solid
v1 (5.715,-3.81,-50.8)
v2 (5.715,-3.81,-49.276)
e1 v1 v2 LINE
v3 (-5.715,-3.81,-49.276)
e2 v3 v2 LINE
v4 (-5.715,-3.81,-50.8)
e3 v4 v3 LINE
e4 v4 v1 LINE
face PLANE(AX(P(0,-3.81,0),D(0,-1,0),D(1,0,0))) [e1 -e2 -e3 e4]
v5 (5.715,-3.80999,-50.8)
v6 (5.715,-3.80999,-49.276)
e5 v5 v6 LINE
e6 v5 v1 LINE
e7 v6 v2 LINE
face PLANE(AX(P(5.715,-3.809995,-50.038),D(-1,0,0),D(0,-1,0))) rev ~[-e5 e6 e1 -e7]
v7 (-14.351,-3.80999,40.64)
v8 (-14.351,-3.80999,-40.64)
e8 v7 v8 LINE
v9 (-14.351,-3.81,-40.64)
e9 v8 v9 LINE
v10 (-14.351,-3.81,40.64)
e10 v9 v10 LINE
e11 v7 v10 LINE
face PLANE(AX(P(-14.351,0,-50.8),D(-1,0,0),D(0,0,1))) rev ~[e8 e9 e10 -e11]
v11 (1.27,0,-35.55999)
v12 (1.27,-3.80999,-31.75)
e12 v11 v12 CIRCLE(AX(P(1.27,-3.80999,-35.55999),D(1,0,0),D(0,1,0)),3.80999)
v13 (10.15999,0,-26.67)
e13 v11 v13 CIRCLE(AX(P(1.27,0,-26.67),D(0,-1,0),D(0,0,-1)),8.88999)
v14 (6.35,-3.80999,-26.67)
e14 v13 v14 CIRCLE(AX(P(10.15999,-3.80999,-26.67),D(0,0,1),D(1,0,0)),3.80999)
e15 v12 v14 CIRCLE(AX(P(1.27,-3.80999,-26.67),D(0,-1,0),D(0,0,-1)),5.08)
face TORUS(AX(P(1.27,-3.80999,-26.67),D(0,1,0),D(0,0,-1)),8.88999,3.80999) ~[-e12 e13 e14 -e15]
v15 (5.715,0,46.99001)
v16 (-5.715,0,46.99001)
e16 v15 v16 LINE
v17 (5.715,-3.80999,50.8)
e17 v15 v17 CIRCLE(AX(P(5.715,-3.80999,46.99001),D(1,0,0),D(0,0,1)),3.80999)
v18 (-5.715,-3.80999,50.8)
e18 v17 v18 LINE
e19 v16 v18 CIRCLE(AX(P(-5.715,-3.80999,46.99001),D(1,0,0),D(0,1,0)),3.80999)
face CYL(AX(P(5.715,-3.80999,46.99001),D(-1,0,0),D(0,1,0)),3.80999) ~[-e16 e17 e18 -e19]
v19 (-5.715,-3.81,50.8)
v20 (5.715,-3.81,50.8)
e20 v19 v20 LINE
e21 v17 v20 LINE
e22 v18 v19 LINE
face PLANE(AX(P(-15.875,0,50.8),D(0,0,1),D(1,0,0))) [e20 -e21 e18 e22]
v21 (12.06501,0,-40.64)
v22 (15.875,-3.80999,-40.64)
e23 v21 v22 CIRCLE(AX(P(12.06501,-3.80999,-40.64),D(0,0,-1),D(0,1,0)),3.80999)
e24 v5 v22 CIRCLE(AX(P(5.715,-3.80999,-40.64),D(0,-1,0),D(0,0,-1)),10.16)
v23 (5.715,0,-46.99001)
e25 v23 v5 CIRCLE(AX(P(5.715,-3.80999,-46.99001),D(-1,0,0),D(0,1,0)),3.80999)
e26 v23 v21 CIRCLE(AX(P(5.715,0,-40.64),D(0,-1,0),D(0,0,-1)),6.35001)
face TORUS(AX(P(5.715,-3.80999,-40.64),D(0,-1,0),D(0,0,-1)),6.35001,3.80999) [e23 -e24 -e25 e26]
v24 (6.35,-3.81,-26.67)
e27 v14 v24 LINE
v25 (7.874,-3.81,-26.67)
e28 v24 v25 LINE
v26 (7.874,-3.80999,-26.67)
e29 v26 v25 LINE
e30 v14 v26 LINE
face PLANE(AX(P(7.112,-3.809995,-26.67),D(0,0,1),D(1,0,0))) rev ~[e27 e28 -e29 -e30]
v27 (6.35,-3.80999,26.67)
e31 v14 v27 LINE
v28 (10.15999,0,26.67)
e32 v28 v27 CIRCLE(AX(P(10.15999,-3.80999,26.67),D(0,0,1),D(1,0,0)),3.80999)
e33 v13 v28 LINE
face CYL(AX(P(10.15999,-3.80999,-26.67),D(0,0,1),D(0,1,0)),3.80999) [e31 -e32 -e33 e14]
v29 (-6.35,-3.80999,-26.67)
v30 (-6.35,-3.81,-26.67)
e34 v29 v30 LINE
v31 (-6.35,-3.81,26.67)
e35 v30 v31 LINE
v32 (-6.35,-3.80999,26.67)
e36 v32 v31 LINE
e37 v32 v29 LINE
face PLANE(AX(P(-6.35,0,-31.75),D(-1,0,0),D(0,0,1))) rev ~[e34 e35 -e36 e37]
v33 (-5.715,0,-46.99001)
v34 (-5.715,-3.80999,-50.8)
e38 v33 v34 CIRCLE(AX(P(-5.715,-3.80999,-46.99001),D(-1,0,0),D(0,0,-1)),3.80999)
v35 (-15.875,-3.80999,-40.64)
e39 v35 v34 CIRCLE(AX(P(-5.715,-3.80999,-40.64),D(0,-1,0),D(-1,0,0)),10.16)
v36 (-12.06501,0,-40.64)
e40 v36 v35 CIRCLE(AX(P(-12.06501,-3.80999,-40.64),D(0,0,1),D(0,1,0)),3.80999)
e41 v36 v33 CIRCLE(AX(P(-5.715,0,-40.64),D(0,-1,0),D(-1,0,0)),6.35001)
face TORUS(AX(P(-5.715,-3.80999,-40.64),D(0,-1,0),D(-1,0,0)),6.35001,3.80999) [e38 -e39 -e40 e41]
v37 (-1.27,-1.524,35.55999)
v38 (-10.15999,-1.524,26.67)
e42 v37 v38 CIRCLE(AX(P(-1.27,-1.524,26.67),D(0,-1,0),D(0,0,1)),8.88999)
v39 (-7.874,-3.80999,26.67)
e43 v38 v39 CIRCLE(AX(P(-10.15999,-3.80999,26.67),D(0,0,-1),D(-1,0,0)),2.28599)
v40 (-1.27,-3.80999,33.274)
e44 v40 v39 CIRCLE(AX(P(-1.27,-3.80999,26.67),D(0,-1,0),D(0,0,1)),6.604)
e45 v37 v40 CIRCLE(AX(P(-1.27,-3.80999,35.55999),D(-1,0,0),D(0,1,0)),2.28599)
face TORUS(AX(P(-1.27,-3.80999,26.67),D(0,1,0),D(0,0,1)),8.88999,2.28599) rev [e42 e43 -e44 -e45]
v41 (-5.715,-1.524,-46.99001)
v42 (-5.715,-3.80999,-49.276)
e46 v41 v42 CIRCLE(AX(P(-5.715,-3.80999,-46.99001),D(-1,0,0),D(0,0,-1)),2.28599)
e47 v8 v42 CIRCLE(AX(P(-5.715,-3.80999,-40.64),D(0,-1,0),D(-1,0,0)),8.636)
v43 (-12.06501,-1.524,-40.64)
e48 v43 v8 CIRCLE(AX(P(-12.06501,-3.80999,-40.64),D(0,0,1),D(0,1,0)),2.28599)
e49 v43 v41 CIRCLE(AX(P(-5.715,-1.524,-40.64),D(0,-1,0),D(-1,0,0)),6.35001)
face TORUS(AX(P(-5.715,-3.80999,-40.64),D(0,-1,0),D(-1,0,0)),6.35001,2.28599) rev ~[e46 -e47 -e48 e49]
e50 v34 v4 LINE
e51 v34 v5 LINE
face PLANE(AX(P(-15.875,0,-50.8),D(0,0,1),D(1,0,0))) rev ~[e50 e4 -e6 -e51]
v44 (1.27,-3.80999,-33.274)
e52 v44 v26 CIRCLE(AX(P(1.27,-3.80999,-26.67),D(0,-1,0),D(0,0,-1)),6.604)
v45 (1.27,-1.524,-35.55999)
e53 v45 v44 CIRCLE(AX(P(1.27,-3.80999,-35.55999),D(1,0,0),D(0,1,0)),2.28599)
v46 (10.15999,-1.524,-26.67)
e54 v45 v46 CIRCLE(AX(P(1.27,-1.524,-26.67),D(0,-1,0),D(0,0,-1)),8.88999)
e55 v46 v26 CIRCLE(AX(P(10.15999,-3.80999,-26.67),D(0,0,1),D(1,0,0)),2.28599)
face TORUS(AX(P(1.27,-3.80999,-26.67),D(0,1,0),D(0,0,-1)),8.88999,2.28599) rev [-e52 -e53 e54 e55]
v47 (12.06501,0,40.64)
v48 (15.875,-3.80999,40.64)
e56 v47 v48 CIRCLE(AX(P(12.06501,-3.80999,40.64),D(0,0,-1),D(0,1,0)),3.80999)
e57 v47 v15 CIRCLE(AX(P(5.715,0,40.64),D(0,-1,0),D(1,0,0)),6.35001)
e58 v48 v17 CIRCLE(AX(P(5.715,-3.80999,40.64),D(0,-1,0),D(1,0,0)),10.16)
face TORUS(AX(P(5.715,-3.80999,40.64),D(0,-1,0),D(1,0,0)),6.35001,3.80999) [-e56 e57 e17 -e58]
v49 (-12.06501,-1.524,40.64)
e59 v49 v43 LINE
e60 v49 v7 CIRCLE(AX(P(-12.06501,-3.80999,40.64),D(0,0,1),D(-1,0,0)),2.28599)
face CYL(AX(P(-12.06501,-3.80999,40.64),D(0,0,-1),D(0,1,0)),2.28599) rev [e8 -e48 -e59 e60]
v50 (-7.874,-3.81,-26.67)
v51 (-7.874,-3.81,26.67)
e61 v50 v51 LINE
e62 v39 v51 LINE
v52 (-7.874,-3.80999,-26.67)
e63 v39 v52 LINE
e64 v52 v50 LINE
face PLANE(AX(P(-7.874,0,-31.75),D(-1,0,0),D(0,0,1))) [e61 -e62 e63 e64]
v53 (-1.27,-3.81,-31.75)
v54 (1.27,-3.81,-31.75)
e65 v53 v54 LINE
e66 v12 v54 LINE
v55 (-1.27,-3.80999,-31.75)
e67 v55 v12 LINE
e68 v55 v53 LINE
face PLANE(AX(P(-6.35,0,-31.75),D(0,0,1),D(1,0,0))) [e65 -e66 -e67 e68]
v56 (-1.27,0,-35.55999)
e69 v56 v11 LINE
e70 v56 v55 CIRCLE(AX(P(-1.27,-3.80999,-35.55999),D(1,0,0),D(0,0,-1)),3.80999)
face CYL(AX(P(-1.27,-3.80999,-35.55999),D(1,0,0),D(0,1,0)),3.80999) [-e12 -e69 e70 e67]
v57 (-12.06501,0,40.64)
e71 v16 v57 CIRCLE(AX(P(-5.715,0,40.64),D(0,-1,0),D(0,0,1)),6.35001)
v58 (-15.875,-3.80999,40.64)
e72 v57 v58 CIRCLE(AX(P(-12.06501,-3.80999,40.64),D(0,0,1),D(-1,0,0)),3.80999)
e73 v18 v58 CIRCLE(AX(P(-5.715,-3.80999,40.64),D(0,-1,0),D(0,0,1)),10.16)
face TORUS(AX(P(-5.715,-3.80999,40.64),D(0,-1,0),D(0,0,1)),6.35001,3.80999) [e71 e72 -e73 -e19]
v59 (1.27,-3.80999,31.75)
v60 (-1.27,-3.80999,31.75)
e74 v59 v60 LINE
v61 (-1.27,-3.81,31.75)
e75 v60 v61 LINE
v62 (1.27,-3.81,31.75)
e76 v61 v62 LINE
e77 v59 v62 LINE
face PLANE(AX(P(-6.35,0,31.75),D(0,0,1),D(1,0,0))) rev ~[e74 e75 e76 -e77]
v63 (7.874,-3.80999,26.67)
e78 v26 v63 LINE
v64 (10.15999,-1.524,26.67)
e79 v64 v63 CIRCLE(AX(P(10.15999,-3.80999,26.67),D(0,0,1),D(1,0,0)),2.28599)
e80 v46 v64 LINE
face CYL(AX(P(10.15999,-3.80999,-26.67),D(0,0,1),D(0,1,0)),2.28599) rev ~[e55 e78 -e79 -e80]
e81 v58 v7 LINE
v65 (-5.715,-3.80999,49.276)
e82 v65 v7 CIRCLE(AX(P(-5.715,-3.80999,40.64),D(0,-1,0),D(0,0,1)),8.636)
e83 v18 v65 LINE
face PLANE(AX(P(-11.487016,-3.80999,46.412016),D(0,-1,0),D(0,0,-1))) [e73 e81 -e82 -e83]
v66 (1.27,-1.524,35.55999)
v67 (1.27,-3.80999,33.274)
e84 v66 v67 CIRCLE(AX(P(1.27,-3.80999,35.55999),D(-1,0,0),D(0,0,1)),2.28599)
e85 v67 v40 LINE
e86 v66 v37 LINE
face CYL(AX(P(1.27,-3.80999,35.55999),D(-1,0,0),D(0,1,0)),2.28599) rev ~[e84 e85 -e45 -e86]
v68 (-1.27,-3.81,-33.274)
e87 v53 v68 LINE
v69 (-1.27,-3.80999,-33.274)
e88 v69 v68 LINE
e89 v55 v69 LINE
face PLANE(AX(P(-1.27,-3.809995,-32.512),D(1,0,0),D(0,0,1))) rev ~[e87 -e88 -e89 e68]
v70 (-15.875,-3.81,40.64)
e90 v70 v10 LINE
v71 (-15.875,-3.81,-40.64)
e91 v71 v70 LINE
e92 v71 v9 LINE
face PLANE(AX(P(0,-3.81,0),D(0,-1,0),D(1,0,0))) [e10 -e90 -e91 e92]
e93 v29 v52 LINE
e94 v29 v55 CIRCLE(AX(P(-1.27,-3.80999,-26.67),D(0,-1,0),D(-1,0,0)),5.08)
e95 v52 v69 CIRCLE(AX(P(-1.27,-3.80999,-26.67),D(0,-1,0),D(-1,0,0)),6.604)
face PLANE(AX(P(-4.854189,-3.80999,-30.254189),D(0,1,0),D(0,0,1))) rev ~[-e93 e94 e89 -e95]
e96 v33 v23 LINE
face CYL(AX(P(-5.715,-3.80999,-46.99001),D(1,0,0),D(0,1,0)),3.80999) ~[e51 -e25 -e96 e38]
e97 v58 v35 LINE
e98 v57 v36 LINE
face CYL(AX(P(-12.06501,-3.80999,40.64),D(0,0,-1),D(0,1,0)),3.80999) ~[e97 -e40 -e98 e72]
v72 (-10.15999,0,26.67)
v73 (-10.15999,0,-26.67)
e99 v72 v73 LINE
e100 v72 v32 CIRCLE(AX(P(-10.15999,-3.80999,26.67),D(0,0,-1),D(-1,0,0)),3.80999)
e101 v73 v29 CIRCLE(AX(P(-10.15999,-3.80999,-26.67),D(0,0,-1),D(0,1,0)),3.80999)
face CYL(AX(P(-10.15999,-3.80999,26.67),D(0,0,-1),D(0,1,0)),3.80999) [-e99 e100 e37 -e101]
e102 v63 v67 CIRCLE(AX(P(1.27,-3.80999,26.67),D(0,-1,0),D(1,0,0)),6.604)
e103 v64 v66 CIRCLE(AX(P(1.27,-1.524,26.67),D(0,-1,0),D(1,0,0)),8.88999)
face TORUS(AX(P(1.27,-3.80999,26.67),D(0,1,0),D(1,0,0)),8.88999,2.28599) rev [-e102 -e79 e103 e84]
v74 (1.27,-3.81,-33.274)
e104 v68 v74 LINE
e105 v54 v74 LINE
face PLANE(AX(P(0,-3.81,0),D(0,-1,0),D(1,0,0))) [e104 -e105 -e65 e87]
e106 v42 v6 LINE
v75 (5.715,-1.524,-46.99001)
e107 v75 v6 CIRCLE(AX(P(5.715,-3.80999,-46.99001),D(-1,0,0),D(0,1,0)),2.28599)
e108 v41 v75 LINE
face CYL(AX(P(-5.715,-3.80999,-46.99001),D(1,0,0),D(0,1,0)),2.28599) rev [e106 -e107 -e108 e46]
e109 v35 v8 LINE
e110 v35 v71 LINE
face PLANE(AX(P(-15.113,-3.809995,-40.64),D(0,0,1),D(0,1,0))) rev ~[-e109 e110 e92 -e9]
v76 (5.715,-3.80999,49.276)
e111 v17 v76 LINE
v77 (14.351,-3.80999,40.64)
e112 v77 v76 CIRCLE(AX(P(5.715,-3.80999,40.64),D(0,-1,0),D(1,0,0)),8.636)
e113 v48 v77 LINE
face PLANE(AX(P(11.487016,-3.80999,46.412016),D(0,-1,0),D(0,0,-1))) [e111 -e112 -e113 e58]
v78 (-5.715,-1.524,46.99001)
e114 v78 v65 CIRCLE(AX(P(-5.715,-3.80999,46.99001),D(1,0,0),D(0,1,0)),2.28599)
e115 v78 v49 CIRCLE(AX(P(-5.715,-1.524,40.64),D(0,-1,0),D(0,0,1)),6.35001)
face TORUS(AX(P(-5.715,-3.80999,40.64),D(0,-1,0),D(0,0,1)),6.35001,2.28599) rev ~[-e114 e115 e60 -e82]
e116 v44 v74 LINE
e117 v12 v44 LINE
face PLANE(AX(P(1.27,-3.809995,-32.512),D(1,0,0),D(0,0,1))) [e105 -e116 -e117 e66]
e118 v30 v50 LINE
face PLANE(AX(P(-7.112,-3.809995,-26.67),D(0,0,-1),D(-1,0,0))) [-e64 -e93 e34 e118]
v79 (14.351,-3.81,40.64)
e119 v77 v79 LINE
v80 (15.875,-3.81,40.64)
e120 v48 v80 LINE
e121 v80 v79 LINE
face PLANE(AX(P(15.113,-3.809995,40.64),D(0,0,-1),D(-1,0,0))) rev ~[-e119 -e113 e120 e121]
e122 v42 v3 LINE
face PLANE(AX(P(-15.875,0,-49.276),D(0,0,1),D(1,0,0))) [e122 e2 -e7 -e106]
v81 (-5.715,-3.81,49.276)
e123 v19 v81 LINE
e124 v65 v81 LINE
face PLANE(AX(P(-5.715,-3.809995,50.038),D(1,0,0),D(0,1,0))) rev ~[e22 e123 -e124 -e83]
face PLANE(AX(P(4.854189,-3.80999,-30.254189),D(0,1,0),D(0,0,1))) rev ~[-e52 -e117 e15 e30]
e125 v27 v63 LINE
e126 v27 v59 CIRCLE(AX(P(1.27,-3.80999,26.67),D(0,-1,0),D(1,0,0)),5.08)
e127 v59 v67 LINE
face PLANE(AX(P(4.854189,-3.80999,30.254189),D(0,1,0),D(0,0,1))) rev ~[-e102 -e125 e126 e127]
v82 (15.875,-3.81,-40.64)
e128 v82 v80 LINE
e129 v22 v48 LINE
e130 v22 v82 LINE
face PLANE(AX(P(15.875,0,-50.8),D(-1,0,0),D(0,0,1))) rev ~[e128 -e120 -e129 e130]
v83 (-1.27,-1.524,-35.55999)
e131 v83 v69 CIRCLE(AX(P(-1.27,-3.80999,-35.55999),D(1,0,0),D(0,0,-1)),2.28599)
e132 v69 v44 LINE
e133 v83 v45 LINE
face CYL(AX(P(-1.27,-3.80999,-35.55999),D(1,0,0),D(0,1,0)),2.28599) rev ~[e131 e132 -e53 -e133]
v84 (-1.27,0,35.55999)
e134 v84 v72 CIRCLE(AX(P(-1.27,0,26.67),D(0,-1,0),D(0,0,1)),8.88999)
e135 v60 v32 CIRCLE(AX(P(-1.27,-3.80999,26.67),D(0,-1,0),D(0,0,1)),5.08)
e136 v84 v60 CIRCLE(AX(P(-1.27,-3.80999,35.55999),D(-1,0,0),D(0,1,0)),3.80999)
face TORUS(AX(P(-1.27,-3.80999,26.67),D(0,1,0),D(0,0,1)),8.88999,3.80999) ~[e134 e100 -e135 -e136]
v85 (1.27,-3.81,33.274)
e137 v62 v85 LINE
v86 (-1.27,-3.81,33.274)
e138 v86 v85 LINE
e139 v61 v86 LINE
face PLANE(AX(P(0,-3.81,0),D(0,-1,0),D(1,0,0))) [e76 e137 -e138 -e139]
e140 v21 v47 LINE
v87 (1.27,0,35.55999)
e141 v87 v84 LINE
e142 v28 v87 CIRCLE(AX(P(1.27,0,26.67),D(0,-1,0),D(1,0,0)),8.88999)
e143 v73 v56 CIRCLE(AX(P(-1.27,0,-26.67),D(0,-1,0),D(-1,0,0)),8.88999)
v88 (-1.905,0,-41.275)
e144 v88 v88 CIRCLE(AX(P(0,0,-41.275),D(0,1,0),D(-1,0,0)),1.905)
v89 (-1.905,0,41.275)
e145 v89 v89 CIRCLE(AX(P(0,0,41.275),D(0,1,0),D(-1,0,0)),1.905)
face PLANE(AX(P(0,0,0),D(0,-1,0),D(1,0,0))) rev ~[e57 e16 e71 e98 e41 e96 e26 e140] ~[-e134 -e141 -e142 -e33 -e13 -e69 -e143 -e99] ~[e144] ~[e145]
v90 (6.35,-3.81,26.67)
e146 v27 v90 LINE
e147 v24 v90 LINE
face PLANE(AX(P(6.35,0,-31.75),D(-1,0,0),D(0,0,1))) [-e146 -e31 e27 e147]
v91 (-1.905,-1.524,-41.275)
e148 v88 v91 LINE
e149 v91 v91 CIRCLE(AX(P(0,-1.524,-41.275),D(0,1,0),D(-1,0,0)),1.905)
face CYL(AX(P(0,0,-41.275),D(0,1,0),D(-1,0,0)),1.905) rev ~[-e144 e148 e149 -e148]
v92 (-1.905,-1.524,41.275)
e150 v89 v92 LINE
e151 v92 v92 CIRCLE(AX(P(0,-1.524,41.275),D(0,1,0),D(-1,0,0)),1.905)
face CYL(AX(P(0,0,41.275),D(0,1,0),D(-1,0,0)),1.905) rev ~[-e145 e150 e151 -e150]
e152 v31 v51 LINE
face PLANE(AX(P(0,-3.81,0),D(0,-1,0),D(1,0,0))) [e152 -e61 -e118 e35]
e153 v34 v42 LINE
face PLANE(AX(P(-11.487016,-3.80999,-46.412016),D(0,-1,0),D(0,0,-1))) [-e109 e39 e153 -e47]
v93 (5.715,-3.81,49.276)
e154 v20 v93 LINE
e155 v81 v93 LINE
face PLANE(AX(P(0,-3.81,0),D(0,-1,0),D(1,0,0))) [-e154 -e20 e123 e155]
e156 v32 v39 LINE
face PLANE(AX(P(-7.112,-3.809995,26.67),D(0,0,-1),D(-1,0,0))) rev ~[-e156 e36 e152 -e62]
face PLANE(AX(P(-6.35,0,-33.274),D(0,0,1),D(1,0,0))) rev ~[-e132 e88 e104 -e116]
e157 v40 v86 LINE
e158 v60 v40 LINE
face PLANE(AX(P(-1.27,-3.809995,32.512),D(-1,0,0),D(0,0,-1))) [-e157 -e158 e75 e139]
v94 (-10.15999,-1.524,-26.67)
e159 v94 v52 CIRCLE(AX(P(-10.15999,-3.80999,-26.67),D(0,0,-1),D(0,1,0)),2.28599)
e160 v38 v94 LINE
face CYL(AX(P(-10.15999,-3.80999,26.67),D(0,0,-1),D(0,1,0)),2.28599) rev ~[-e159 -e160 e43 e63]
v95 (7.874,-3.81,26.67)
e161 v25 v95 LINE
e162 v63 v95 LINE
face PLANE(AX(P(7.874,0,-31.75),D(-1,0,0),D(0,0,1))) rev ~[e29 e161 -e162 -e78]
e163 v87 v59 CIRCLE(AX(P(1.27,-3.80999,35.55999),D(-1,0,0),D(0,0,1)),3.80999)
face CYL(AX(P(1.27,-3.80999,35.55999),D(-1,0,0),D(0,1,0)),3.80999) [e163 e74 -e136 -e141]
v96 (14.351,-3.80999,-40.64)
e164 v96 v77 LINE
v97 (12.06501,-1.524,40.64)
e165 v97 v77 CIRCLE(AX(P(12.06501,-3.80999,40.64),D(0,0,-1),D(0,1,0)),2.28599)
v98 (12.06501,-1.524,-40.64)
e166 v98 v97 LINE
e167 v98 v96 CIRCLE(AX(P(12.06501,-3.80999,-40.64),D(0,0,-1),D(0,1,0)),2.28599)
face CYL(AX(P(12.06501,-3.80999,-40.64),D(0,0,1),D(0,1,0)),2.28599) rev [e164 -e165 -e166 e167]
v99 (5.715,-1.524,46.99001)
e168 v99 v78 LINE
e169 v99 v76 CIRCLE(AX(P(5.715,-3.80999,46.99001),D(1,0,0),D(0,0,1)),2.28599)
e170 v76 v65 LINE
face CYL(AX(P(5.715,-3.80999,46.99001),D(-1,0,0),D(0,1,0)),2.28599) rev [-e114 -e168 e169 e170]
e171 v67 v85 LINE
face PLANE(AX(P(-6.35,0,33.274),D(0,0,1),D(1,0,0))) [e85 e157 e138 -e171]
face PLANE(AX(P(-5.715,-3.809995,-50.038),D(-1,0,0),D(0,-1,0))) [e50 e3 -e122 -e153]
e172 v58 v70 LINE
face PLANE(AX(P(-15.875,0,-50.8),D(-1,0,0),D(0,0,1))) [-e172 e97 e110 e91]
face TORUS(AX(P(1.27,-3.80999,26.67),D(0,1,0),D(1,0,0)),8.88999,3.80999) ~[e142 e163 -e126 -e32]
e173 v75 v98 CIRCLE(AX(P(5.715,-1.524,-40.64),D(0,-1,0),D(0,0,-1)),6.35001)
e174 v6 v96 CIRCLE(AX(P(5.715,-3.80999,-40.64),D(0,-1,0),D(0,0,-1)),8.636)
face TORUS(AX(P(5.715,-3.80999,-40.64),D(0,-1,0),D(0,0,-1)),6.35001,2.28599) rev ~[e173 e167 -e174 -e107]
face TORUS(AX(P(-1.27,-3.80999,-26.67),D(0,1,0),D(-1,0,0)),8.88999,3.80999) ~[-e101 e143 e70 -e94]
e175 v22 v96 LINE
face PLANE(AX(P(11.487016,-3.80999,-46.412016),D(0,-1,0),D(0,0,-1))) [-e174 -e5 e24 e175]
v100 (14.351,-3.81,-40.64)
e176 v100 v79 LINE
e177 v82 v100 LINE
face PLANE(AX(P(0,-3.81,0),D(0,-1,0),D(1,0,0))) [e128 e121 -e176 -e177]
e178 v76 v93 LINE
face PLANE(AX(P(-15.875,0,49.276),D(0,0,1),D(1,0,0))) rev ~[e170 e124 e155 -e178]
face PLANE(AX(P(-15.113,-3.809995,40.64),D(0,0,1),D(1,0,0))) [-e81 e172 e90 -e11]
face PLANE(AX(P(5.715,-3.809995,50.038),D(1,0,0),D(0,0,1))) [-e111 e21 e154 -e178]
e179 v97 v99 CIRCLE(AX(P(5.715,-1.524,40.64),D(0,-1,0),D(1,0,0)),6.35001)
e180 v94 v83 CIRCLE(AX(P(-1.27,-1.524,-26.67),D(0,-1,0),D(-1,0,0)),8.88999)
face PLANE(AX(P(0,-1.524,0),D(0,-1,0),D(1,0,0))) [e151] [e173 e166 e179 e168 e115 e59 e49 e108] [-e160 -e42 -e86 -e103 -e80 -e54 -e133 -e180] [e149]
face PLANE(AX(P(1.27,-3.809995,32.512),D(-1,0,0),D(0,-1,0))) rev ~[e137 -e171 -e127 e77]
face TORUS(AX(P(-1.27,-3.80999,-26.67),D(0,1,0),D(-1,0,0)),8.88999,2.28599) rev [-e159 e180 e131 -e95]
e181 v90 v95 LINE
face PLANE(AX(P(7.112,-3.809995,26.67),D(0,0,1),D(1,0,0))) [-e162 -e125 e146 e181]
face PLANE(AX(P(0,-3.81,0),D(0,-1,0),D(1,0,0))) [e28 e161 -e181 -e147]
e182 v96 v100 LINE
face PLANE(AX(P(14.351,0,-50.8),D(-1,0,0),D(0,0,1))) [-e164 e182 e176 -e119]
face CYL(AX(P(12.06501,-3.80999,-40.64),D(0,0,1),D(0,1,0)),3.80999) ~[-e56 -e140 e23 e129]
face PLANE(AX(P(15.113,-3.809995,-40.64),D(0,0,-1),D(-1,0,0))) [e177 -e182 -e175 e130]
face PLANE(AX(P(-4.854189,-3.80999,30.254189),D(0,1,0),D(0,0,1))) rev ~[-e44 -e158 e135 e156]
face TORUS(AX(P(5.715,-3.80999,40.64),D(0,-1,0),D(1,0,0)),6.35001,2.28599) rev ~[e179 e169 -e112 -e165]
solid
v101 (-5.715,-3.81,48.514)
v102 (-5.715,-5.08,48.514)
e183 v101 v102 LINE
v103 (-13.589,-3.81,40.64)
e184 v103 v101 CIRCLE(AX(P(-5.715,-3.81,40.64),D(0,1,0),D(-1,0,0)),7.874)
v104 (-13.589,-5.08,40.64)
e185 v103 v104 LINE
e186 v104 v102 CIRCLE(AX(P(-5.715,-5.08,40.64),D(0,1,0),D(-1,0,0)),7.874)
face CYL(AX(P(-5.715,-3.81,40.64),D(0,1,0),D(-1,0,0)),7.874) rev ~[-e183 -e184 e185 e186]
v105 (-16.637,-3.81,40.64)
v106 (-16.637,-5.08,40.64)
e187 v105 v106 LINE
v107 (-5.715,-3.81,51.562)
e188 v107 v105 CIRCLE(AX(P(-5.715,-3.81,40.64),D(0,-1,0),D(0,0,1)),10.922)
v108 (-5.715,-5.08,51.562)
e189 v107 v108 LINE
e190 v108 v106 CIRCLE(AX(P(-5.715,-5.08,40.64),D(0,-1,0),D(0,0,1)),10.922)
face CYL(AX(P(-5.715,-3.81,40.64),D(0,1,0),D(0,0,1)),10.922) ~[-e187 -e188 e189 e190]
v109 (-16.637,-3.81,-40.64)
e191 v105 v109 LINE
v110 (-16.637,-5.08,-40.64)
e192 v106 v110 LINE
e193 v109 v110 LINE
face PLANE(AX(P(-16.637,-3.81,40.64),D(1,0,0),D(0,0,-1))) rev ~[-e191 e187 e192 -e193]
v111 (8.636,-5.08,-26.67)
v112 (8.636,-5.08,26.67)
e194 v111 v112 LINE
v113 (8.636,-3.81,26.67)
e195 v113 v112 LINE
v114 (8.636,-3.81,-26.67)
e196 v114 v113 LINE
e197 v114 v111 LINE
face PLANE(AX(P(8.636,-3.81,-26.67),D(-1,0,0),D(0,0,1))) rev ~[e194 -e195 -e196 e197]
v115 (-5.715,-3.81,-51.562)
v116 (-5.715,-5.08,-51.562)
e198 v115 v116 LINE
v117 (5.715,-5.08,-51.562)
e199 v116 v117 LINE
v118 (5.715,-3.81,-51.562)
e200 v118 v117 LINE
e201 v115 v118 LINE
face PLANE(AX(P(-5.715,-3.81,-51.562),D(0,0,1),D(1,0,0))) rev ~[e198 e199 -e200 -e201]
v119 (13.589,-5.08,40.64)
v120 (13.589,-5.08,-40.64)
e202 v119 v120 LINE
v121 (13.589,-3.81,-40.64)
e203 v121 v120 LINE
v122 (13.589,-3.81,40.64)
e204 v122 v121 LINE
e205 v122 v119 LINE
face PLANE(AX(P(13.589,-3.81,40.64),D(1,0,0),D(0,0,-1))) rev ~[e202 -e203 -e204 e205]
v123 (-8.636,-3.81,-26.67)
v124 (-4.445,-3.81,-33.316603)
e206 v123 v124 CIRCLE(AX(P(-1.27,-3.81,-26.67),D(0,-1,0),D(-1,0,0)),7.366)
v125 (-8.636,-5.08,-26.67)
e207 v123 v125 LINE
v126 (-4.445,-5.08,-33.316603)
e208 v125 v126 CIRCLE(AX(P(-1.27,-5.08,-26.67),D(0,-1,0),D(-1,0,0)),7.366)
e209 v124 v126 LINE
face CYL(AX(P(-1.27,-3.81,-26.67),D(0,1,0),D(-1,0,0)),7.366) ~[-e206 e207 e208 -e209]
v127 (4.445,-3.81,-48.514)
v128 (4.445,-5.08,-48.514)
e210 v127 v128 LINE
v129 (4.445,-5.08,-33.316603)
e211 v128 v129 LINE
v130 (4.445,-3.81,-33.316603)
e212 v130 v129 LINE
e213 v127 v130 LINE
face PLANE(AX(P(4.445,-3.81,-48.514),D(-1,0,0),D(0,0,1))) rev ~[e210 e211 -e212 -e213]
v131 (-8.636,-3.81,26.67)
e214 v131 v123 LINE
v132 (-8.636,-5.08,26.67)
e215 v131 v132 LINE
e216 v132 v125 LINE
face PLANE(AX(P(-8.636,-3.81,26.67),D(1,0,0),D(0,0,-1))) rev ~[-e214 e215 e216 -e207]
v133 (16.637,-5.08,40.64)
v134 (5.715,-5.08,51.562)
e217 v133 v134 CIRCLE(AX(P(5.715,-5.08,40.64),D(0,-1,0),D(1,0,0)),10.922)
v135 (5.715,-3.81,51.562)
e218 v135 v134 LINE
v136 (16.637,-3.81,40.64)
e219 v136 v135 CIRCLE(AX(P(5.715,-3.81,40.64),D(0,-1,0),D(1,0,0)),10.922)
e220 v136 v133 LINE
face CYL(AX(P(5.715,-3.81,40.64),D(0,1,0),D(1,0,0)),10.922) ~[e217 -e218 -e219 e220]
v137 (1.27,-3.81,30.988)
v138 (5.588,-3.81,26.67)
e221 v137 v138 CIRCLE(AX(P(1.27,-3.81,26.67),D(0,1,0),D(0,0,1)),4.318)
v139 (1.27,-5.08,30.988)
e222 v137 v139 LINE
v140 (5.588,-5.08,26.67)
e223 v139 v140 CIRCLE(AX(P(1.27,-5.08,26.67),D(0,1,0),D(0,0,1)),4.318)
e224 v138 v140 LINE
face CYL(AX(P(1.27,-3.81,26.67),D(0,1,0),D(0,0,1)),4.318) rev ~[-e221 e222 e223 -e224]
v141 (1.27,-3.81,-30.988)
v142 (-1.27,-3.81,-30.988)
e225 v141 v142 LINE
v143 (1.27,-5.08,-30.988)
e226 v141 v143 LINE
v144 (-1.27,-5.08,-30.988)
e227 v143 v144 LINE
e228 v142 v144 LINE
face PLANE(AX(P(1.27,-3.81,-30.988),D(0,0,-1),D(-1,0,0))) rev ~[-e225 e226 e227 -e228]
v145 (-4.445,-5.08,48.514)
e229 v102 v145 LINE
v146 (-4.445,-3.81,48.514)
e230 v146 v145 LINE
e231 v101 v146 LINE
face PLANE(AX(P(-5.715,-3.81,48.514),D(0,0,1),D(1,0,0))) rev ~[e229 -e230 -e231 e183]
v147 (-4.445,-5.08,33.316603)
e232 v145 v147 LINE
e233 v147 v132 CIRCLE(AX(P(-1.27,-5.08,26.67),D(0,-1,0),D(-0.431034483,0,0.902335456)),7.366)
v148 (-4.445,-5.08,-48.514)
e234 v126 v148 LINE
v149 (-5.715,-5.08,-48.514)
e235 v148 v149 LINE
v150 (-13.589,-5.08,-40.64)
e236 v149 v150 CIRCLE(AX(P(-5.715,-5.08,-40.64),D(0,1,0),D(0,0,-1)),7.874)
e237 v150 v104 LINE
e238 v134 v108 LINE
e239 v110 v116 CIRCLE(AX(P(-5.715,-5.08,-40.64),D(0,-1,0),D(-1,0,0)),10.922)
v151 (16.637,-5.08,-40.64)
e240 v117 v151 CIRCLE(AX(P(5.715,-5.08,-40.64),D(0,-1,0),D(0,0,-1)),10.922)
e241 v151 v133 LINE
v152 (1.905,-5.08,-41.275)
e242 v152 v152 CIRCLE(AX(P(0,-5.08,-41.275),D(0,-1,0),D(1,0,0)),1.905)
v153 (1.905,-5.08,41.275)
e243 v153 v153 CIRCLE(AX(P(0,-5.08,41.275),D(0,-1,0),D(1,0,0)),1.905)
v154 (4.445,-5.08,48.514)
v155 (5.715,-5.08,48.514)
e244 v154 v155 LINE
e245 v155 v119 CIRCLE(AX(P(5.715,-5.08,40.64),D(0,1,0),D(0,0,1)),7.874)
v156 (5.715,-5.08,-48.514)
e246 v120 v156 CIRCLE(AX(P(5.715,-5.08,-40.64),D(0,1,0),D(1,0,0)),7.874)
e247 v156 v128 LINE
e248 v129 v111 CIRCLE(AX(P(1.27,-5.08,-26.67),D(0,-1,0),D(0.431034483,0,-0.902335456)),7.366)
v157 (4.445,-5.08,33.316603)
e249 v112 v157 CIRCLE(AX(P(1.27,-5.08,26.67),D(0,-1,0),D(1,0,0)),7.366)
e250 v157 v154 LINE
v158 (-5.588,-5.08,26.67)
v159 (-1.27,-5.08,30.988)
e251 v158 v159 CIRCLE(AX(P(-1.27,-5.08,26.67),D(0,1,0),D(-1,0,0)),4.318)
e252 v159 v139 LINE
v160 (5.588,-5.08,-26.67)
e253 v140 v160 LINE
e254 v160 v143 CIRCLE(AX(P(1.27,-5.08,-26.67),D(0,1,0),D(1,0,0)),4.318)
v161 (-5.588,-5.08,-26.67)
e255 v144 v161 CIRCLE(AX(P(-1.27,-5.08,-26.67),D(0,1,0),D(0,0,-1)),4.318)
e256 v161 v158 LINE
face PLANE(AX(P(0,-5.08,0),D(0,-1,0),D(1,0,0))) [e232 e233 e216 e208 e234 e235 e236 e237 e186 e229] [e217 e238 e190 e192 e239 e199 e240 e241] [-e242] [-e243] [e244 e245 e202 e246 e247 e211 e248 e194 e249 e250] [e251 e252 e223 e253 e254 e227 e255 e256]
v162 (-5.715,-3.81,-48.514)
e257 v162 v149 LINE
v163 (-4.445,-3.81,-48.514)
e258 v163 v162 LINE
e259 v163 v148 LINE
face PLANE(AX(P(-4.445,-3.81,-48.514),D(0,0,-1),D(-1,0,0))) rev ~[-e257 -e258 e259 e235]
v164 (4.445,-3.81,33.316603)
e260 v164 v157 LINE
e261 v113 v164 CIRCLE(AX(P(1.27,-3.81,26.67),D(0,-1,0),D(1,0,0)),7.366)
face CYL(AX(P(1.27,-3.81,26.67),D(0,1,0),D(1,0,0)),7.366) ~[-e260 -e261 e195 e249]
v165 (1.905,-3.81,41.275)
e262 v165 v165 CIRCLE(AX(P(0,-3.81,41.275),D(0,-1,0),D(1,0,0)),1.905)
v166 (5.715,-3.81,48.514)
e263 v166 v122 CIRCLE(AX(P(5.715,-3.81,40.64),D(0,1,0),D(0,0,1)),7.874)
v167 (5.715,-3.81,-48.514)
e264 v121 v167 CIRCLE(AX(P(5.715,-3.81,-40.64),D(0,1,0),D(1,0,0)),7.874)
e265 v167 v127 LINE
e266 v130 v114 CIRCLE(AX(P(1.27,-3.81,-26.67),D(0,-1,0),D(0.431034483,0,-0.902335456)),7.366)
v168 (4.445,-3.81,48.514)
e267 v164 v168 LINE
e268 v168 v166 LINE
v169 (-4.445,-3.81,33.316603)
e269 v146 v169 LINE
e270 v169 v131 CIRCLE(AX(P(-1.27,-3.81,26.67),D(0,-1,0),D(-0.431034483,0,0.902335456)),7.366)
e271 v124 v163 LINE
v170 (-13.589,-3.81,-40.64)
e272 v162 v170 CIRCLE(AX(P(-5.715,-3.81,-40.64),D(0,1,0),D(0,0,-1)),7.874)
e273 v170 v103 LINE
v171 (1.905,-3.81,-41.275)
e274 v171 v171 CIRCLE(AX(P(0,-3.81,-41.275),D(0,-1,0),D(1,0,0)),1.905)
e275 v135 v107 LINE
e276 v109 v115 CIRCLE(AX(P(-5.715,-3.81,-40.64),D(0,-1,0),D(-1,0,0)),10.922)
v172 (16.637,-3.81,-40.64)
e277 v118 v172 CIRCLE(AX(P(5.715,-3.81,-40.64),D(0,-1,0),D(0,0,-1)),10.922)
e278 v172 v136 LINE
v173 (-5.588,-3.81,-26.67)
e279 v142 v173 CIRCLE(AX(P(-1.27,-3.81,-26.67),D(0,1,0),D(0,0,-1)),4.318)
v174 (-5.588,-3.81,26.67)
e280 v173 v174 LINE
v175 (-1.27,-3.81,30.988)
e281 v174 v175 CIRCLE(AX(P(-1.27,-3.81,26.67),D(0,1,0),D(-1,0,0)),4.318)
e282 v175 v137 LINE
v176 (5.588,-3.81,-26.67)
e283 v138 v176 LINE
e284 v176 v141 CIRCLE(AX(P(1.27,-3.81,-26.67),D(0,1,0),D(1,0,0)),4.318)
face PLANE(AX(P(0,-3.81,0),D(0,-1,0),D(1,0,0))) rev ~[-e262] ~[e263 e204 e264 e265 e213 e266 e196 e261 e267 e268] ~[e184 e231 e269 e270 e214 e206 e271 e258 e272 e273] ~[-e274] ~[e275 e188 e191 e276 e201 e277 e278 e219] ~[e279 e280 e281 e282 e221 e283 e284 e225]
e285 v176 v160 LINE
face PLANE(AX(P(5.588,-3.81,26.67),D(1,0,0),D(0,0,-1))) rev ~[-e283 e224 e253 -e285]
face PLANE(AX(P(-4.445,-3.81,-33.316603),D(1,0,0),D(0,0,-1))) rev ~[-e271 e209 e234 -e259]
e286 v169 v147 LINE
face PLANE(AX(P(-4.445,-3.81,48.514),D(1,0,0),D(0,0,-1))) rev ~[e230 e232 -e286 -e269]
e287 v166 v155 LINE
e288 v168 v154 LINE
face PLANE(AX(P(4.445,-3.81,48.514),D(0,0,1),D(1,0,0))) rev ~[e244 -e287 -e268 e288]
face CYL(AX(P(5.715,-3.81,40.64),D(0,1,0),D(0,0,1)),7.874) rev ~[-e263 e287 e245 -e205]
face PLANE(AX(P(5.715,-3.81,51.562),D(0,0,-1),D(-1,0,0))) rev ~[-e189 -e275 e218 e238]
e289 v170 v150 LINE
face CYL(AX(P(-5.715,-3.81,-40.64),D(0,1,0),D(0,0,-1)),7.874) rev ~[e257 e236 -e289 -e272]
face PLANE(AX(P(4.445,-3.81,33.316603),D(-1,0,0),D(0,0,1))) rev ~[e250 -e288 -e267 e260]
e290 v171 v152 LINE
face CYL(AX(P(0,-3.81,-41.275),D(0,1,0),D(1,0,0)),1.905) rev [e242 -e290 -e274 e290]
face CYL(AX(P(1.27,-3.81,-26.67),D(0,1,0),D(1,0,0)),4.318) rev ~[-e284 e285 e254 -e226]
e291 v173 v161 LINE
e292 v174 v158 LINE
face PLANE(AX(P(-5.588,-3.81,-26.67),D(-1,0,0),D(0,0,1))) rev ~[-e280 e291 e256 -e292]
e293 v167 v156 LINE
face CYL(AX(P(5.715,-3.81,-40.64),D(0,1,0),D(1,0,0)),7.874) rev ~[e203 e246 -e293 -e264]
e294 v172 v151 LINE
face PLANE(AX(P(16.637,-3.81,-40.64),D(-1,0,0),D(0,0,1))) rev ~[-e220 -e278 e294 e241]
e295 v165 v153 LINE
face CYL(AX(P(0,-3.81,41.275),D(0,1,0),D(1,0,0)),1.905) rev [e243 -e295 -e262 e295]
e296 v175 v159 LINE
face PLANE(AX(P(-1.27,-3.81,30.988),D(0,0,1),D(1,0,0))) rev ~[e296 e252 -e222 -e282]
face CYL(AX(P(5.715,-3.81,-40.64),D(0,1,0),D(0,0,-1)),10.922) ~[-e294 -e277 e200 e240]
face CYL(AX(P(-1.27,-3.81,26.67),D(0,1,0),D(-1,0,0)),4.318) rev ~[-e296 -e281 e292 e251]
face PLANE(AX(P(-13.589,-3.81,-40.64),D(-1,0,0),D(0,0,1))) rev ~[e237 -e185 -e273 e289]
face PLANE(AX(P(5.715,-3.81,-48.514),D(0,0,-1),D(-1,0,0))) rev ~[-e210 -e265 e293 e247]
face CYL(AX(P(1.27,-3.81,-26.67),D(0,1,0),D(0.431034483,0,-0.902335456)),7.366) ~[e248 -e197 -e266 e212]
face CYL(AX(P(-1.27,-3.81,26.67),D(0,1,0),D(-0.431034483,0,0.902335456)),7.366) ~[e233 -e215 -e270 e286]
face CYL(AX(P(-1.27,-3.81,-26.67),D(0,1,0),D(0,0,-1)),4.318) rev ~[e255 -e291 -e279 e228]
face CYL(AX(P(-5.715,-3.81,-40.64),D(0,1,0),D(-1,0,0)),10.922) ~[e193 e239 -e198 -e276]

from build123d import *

# Parameters (mm, degrees)
F0_W     = 31.75
F0_H     = 101.6
F0_W_2   = 12.7
F0_H_2   = 63.5
F1_DEPTH = 3.81
F2_R     = 10.16
F3_R     = 5.08
F4_R     = 3.80999
F5_T     = 1.524
F6_R     = 1.905
F7_DEPTH = 1.524
F8_R     = 1.905
F9_DEPTH = 1.27


# Not quite as in the source:
# - a fillet or chamfer is up to 0.001 mm smaller than in the source, because OpenCascade refuses the exact size
# - a shell that OpenCascade refuses in one call is made with other operations: the cavity is built on its own and cut out


with BuildPart() as f1:
    # F0 (on Front) → F1 (new body)
    with BuildSketch(Plane.XZ):
        Rectangle(F0_W, F0_H)
        Rectangle(F0_W_2, F0_H_2, mode=Mode.SUBTRACT)
    extrude(amount=F1_DEPTH)

    # F2
    f2_edges = [f1.edges().sort_by_distance(p)[0] for p in [
        (-15.875, -1.905, 50.8),
        (15.875, -1.905, 50.8),
        (15.875, -1.905, -50.8),
        (-15.875, -1.905, -50.8),
    ]]
    fillet(f2_edges, radius=F2_R)

    # F3
    f3_edges = [f1.edges().sort_by_distance(p)[0] for p in [
        (-6.35, -1.905, 31.75),
        (6.35, -1.905, 31.75),
        (-6.35, -1.905, -31.75),
        (6.35, -1.905, -31.75),
    ]]
    fillet(f3_edges, radius=F3_R)

    # F4 (radius 3.81 in the source; OpenCascade refuses exactly that, so slightly less here)
    f4_edges = [f1.edges().sort_by_distance(p)[0] for p in [
        (15.875, 0, 0),
        (4.862102, 0, 30.262102),
    ]]
    fillet(f4_edges, radius=F4_R)

    # F5: shell of thickness 1.524, made by hand


with BuildPart() as f5_core1:
    # F5_t2: copy of F1
    add(f1.part)

    # the walls: a layer under each face that stays
    f5_faces = [f5_core1.faces().sort_by_distance(p)[0] for p in [
        (-10.3414371429, 0, -40.2771514286),
        (14.7590797653, -1.1159202347, 0),
        (12.1101301316, -1.1159202347, -47.0351301316),
        (12.1101301316, -1.1159202347, 47.0351301316),
        (0, -1.1159202347, -49.6840797653),
        (0, -1.1159202347, 49.6840797653),
        (-12.1101301316, -1.1159202347, -47.0351301316),
        (-12.1101301316, -1.1159202347, 47.0351301316),
        (-14.7590797653, -1.1159202347, 0),
        (5.6511772137, -1.1159202347, 31.0511772137),
        (0, -1.1159202347, 32.8659202347),
        (7.4659202347, -1.1159202347, 0),
        (-5.6511772137, -1.1159202347, 31.0511772137),
        (5.6511772137, -1.1159202347, -31.0511772137),
        (-7.4659202347, -1.1159202347, 0),
        (0, -1.1159202347, -32.8659202347),
        (-5.6511772137, -1.1159202347, -31.0511772137),
        (15.875, -3.809995, 0),
        (12.8992048969, -3.809995, -47.8242048969),
        (12.8992048969, -3.809995, 47.8242048969),
        (0, -3.809995, -50.8),
        (0, -3.809995, 50.8),
        (-12.8992048969, -3.809995, -47.8242048969),
        (-12.8992048969, -3.809995, 47.8242048969),
        (-15.875, -3.809995, 0),
        (4.8621024484, -3.809995, 30.2621024484),
        (0, -3.809995, 31.75),
        (6.35, -3.809995, 0),
        (-4.8621024484, -3.809995, 30.2621024484),
        (4.8621024484, -3.809995, -30.2621024484),
        (-6.35, -3.809995, 0),
        (0, -3.809995, -31.75),
        (-4.8621024484, -3.809995, -30.2621024484),
    ]]
    thicken(f5_faces, amount=-F5_T, mode=Mode.SUBTRACT)


with BuildPart() as f1_1:
    add(f1.part)

    # what is left inside the walls is the cavity
    f5_cavity = [f5_core1.part.solids().sort_by_distance(p)[0] for p in [
        (-7.9375, -3.79476, 16.933333),
    ]]
    add(f5_cavity, mode=Mode.SUBTRACT)

    # F6 (on face) → F7 (cut, through all)
    with BuildSketch(Plane(origin=(0, 0, 0), x_dir=(-1, 0, 0), z_dir=(0, 1, 0))):
        with Locations((0, 41.275)):
            Circle(F6_R)
        with Locations((0, -41.275)):
            Circle(F6_R)
    extrude(amount=-F7_DEPTH, mode=Mode.SUBTRACT)


with BuildPart() as f9:
    # F8 (on face) → F9 (new body)
    with BuildSketch(Plane.XZ.offset(3.81)):
        with BuildLine():
            ThreePointArc((-5.715, 51.5620000048), (-13.4380202658, 48.3630202672), (-16.637, 40.64))
            Line((-16.637, 40.64), (-16.637, -40.64))
            ThreePointArc((-16.637, -40.64), (-13.4380202641, -48.3630202641), (-5.715, -51.562))
            Line((-5.715, -51.562), (5.715, -51.562))
            ThreePointArc((5.715, -51.562), (13.4380202641, -48.3630202641), (16.637, -40.64))
            Line((16.637, -40.64), (16.637, 40.64))
            ThreePointArc((16.637, 40.64), (13.4380202658, 48.3630202672), (5.715, 51.5620000048))
            Line((5.715, 51.5620000048), (-5.715, 51.5620000048))
        make_face()
        with BuildLine():
            Line((-5.715, 48.514), (-4.445, 48.514))
            Line((-4.445, 48.514), (-4.445, 33.3166029669))
            ThreePointArc((-4.445, 33.3166029669), (-7.5007706586, 30.5987979078), (-8.636, 26.67))
            Line((-8.636, 26.67), (-8.636, -26.67))
            ThreePointArc((-8.636, -26.67), (-7.5007706586, -30.5987979078), (-4.445, -33.3166029669))
            Line((-4.445, -33.3166029669), (-4.445, -48.514))
            Line((-4.445, -48.514), (-5.715, -48.514))
            ThreePointArc((-5.715, -48.514), (-11.2827587951, -46.2077587951), (-13.589, -40.64))
            Line((-13.589, -40.64), (-13.589, 40.64))
            ThreePointArc((-13.589, 40.64), (-11.2827587951, 46.2077587951), (-5.715, 48.514))
        make_face(mode=Mode.SUBTRACT)
        with Locations((0, -41.275)):
            Circle(F8_R, mode=Mode.SUBTRACT)
        with BuildLine():
            Line((-5.588, -26.67), (-5.588, 26.67))
            ThreePointArc((-5.588, 26.67), (-4.3232870812, 29.7232870812), (-1.27, 30.988))
            Line((-1.27, 30.988), (1.27, 30.988))
            ThreePointArc((1.27, 30.988), (4.3232870812, 29.7232870812), (5.588, 26.67))
            Line((5.588, 26.67), (5.588, -26.67))
            ThreePointArc((5.588, -26.67), (4.3232870812, -29.7232870812), (1.27, -30.988))
            Line((1.27, -30.988), (-1.27, -30.988))
            ThreePointArc((-1.27, -30.988), (-4.3232870812, -29.7232870812), (-5.588, -26.67))
        make_face(mode=Mode.SUBTRACT)
        with BuildLine():
            Line((4.445, 33.3166029669), (4.445, 48.514))
            Line((4.445, 48.514), (5.715, 48.514))
            ThreePointArc((5.715, 48.514), (11.2827587951, 46.2077587951), (13.589, 40.64))
            Line((13.589, 40.64), (13.589, -40.64))
            ThreePointArc((13.589, -40.64), (11.2827587951, -46.2077587951), (5.715, -48.514))
            Line((5.715, -48.514), (4.445, -48.514))
            Line((4.445, -48.514), (4.445, -33.3166029669))
            ThreePointArc((4.445, -33.3166029669), (7.5007706586, -30.5987979078), (8.636, -26.67))
            Line((8.636, -26.67), (8.636, 26.67))
            ThreePointArc((8.636, 26.67), (7.5007706586, 30.5987979078), (4.445, 33.3166029669))
        make_face(mode=Mode.SUBTRACT)
        with Locations((0, 41.275)):
            Circle(F8_R, mode=Mode.SUBTRACT)
    extrude(amount=F9_DEPTH)


solid = Compound([f1_1.part, f9.part])
